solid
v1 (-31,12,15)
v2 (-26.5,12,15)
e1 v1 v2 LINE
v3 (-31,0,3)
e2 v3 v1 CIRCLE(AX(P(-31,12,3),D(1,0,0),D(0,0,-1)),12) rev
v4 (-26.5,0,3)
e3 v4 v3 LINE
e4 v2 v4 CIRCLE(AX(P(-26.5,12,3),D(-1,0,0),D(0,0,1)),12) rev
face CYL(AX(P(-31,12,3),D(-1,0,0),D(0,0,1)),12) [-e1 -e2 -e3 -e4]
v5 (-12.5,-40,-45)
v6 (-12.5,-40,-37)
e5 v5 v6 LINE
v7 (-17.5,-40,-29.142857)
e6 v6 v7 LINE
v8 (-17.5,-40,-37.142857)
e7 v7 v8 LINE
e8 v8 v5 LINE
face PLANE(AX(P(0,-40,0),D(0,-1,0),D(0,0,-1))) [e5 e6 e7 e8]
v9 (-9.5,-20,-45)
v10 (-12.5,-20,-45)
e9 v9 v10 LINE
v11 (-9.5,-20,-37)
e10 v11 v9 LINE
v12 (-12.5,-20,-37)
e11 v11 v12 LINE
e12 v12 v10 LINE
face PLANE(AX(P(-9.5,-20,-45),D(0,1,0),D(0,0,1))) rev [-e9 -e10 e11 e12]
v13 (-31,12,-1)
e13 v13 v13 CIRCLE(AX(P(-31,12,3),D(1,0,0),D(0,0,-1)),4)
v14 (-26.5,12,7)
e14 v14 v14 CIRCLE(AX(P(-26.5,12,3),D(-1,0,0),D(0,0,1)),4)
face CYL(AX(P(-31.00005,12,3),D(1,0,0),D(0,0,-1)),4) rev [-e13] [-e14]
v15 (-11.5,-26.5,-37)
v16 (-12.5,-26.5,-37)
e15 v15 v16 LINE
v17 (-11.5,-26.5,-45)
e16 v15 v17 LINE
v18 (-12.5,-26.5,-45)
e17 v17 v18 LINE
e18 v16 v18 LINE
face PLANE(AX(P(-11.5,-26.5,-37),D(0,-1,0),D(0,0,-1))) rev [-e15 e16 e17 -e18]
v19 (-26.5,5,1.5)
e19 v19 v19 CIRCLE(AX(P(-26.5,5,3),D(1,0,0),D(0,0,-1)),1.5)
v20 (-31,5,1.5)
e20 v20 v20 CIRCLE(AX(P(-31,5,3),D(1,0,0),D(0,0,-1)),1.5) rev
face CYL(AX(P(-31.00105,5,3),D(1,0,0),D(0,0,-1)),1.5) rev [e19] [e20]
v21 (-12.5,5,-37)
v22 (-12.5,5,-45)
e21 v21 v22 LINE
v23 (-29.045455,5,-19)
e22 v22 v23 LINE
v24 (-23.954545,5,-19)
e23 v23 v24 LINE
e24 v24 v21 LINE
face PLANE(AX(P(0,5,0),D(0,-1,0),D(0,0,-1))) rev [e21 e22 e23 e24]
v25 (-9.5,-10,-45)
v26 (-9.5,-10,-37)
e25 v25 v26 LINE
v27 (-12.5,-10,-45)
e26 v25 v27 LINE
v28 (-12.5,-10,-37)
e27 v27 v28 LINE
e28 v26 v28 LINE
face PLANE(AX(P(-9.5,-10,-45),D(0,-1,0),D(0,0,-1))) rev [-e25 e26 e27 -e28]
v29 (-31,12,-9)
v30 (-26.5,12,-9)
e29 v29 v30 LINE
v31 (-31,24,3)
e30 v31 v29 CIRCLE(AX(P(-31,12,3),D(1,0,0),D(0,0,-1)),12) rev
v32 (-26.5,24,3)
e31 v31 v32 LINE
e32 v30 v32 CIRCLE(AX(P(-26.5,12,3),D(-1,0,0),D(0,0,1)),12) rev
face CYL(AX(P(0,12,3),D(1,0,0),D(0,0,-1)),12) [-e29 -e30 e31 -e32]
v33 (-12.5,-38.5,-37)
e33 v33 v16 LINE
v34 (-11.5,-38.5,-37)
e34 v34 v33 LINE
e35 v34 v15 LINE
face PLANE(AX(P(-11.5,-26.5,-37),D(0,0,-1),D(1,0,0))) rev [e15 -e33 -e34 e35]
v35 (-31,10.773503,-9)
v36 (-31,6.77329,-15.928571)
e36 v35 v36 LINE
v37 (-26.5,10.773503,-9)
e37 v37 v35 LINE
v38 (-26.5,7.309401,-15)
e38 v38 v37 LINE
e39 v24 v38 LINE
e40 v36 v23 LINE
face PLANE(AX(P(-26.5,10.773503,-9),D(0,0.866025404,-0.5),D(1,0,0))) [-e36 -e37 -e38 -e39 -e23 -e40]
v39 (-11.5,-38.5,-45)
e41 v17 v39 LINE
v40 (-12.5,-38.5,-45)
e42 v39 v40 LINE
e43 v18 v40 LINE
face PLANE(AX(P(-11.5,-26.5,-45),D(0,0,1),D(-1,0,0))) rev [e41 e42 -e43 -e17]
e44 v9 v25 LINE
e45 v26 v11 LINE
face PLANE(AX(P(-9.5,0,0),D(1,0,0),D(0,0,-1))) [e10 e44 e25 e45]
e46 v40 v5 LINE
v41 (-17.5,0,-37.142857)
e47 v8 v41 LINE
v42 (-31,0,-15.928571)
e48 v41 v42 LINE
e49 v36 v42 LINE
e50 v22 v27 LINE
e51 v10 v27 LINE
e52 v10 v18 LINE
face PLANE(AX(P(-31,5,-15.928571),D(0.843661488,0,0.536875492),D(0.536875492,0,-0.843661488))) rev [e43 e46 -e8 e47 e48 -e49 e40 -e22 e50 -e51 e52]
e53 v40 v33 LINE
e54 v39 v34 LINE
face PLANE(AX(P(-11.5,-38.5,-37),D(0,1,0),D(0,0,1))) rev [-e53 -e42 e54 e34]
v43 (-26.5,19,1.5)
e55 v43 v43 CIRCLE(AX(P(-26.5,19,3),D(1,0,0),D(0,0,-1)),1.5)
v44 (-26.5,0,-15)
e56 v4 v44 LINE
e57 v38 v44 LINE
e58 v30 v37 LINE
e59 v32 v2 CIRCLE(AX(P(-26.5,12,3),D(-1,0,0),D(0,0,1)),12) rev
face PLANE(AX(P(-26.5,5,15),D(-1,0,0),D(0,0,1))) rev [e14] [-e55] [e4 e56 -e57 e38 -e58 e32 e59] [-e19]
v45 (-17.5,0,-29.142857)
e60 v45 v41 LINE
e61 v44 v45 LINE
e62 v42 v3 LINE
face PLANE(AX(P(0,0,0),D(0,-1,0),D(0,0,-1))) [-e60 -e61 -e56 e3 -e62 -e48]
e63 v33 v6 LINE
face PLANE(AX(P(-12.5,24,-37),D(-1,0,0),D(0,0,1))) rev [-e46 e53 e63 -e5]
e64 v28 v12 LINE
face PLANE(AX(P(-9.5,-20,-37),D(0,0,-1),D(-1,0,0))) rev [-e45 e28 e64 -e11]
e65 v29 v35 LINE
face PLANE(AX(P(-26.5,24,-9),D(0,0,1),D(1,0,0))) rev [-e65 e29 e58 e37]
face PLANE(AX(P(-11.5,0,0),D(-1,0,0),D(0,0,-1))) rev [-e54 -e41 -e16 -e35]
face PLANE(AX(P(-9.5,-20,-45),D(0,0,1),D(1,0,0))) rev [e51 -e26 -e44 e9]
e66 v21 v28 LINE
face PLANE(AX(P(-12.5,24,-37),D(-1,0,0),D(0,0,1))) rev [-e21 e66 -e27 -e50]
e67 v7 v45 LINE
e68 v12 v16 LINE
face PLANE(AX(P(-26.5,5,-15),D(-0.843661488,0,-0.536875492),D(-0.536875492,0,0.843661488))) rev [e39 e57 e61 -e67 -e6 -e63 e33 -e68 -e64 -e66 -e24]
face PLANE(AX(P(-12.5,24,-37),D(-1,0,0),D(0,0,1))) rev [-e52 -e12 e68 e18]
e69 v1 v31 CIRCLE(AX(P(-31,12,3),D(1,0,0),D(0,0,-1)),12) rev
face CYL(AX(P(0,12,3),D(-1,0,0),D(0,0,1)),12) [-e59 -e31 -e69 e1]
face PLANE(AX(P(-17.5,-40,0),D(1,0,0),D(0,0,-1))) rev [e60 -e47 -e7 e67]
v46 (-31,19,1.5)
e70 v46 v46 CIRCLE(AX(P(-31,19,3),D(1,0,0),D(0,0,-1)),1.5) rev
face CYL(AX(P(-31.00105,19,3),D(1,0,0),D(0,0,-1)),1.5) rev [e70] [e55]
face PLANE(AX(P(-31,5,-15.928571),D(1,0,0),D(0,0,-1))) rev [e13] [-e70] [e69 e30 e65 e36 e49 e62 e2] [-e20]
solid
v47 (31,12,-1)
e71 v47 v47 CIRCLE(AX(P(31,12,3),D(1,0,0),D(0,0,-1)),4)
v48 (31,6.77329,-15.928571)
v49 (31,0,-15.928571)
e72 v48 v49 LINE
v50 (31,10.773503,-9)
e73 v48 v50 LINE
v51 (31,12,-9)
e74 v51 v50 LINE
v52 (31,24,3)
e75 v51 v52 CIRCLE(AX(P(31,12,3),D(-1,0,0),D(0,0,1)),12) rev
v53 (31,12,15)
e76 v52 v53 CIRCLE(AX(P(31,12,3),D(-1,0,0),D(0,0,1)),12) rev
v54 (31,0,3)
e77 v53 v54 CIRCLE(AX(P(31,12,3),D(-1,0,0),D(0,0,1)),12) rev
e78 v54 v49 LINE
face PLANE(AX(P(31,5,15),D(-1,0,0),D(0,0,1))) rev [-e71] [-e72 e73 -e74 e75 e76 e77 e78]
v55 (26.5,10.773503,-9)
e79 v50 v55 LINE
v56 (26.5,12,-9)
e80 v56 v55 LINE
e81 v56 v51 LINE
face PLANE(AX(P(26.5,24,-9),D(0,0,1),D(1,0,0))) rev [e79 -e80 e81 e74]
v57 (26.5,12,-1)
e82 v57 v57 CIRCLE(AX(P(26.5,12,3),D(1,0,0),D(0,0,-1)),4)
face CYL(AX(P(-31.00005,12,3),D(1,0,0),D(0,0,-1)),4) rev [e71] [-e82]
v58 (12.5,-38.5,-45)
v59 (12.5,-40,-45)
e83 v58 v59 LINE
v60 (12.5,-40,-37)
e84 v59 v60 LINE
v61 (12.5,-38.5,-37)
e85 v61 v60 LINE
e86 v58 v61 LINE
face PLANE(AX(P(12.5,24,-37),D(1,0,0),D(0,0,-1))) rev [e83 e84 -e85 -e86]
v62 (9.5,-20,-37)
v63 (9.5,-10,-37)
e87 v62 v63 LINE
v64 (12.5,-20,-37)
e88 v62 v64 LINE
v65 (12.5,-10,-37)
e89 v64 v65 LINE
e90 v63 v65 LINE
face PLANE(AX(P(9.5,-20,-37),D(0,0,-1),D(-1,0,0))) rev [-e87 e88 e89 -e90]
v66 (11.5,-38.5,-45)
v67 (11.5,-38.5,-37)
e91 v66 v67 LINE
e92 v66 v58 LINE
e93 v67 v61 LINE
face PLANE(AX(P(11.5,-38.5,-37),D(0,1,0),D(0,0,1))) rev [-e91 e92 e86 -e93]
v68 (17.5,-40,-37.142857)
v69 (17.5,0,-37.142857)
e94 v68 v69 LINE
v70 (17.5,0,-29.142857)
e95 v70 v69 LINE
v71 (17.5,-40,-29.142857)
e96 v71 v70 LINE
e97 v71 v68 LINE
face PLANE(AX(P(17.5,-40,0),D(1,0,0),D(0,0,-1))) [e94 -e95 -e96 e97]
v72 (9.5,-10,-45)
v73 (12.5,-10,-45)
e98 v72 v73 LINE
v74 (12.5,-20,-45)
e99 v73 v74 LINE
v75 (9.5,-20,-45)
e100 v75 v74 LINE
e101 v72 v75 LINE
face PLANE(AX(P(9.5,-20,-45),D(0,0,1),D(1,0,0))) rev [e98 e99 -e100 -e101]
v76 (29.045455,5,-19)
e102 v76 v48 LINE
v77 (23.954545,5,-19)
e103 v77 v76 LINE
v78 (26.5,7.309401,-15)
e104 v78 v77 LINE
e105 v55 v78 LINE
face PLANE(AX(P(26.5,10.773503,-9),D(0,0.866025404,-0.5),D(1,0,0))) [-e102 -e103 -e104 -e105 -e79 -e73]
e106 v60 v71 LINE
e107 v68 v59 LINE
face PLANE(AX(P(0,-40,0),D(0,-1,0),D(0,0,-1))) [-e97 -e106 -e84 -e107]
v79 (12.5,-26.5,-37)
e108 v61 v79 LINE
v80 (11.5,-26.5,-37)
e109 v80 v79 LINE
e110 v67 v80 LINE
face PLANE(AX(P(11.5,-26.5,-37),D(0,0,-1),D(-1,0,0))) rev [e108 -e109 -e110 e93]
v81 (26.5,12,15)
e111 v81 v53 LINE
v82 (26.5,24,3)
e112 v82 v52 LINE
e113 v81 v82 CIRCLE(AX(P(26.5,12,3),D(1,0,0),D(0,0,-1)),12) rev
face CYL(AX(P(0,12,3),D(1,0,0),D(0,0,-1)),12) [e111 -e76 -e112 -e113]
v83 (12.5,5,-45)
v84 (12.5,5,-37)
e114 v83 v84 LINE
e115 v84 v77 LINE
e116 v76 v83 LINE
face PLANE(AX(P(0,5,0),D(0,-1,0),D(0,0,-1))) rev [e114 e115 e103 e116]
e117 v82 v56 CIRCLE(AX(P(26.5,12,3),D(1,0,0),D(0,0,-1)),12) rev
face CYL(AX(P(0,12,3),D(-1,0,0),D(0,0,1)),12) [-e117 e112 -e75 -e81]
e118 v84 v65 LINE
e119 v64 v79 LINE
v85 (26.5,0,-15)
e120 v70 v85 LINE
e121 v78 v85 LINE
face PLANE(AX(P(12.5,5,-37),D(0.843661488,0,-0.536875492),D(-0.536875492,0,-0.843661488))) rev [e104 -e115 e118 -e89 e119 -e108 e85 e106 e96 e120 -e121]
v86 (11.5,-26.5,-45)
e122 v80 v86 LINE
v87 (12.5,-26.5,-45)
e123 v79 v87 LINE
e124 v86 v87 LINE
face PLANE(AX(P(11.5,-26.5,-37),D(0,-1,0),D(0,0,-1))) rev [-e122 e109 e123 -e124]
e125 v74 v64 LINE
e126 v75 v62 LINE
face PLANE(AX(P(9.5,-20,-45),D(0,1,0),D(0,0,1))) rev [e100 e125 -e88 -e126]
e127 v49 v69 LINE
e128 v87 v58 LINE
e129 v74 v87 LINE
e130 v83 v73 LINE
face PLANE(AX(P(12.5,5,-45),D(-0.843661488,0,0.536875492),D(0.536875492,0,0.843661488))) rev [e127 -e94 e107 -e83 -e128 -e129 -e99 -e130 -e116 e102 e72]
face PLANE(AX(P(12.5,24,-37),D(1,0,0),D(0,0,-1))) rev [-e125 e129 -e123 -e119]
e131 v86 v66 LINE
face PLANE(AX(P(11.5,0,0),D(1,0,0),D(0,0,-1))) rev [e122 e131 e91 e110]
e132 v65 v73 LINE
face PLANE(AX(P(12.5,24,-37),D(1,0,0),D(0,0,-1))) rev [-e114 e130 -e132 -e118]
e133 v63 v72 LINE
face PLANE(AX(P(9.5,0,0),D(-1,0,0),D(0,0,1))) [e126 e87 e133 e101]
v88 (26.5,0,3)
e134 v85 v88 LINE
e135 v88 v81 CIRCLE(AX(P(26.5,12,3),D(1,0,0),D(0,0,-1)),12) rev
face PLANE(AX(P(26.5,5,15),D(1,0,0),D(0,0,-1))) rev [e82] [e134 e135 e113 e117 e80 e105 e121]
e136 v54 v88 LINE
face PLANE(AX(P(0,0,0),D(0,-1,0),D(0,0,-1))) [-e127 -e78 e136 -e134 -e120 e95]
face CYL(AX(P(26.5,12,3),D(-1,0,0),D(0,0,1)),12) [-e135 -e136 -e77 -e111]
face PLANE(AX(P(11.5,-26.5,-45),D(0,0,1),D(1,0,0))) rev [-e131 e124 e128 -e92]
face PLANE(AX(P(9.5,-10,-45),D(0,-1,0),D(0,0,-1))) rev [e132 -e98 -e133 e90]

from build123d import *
from OCP.BRepFilletAPI import BRepFilletAPI_MakeChamfer

# Parameters (mm, degrees)
BOSS_EXTRUDE1_DEPTH     = 5
SKETCH2_W               = 4.5
SKETCH2_H               = 24
BOSS_EXTRUDE2_DEPTH     = 19
CUT_EXTRUDE1_REACH      = 59.853
SKETCH5_R               = 1.7
CUT_EXTRUDE2_REACH      = 73.673
SKETCH6_W               = 14
SKETCH6_H               = 3
CUT_EXTRUDE3_REACH      = 78.859
SKETCH7_R               = 1.5
CUT_EXTRUDE4_DEPTH      = 77.85863647
CUT_EXTRUDE4_DEPTH_BACK = 77.85863647
SKETCH8_R               = 4
FILLET1_R               = 12
CHAMFER2_SIZE           = 10
CHAMFER2_SIZE2          = 5.773502692
CUT_EXTRUDE5_REACH      = 59.853
SKETCH10_R              = 1.7
SKETCH_1_W              = 25
SKETCH_1_H              = 8
CUT_EXTRUDE_1_DEPTH     = 60.682493246
EXTRUDE_2_DEPTH         = 40
SKETCH_5_W              = 8
SKETCH_5_H              = 10
EXTRUDE_3_DEPTH         = 3
SKETCH_4_W              = 8
SKETCH_4_H              = 10
EXTRUDE_4_DEPTH         = 3
SKETCH_7_W              = 8
SKETCH_7_H              = 12
EXTRUDE_5_DEPTH         = 1


with BuildPart() as part:
    # Sketch1 → Boss-Extrude1 (new body)
    with BuildSketch(Plane(origin=(0, 0, 0), x_dir=(1, 0, 0), z_dir=(0, 1, 0))):
        Polygon((-31, 15.928571429), (-31, -15), (-26.5, -15), (-26.5, 15), (-12.5, 37), (12.5, 37), (26.5, 15), (26.5, -15), (31, -15), (31, 15.928571429), (12.5, 45), (-12.5, 45), align=None)
    extrude(amount=BOSS_EXTRUDE1_DEPTH)

    # Sketch2 → Boss-Extrude2 (add)
    with BuildSketch(Plane(origin=(0, 5, 0), x_dir=(1, 0, 0), z_dir=(0, 1, 0))):
        with Locations((-28.75, -3)):
            Rectangle(SKETCH2_W, SKETCH2_H)
        with Locations((28.75, -3)):
            Rectangle(SKETCH2_W, SKETCH2_H)
    extrude(amount=BOSS_EXTRUDE2_DEPTH)

    # Sketch5 → Cut-Extrude1 (cut, up to next)
    with BuildSketch(Plane(origin=(0, 5, 0), x_dir=(1, 0, 0), z_dir=(0, 1, 0)), mode=Mode.PRIVATE) as cut_extrude1_sk1:
        with Locations(Location((0, 41, 0), (0, 0, 270))):
            Circle(SKETCH5_R)
    cut_extrude1_tool1 = extrude(cut_extrude1_sk1.sketch, amount=-CUT_EXTRUDE1_REACH, mode=Mode.PRIVATE) & part.part
    add(cut_extrude1_tool1.solids().sort_by_distance((0, 5, -41))[0], mode=Mode.SUBTRACT)

    # Cut-Extrude2: up to this face of the body (flat: up to its plane)
    cut_extrude2_end = Plane(part.part.faces().sort_by_distance((0, 2.5, -37))[0])
    # Sketch6 → Cut-Extrude2 (cut, up to the picked face)
    with BuildSketch(Plane(origin=(0, 0, -45), x_dir=(-1, 0, 0), z_dir=(0, 0, -1)), mode=Mode.PRIVATE) as cut_extrude2_sk1:
        with Locations((0, 3.5)):
            Rectangle(SKETCH6_W, SKETCH6_H)
    cut_extrude2_tool1 = split(extrude(cut_extrude2_sk1.sketch, amount=-CUT_EXTRUDE2_REACH, mode=Mode.PRIVATE), bisect_by=cut_extrude2_end, keep=Keep.BOTH, mode=Mode.PRIVATE)
    add(cut_extrude2_tool1.solids().sort_by(Axis((0, 3.5, -45), (0, 0, 1)))[0], mode=Mode.SUBTRACT)

    # Sketch7 → Cut-Extrude3 (cut, up to next)
    with BuildSketch(Plane(origin=(-26.5, 0, 0), x_dir=(0, 0, -1), z_dir=(1, 0, 0)), mode=Mode.PRIVATE) as cut_extrude3_sk1:
        with Locations((-3, 19)):
            Circle(SKETCH7_R)
    cut_extrude3_tool1 = extrude(cut_extrude3_sk1.sketch, amount=-CUT_EXTRUDE3_REACH, mode=Mode.PRIVATE) & part.part
    # Sketch7 → Cut-Extrude3 (cut, up to next)
    with BuildSketch(Plane(origin=(-26.5, 0, 0), x_dir=(0, 0, -1), z_dir=(1, 0, 0)), mode=Mode.PRIVATE) as cut_extrude3_sk2:
        with Locations((-3, 5)):
            Circle(SKETCH7_R)
    cut_extrude3_tool2 = extrude(cut_extrude3_sk2.sketch, amount=-CUT_EXTRUDE3_REACH, mode=Mode.PRIVATE) & part.part
    add(cut_extrude3_tool1.solids().sort_by_distance((-26.5, 19, 3))[0], mode=Mode.SUBTRACT)
    add(cut_extrude3_tool2.solids().sort_by_distance((-26.5, 5, 3))[0], mode=Mode.SUBTRACT)

    # Sketch8 → Cut-Extrude4 (cut, two sides: drawn at the far end of the back side and taken through both)
    with BuildSketch(Plane(origin=(-26.5, 0, 0), x_dir=(0, 0, -1), z_dir=(1, 0, 0)).offset(-CUT_EXTRUDE4_DEPTH_BACK)):
        with Locations((-3, 12)):
            Circle(SKETCH8_R)
    extrude(amount=CUT_EXTRUDE4_DEPTH + CUT_EXTRUDE4_DEPTH_BACK, mode=Mode.SUBTRACT)

    # Fillet1
    fillet1_edges = [part.edges().sort_by_distance(p)[0] for p in [
        (28.75, 0, 15),
        (-28.75, 0, 15),
        (-28.75, 24, -9),
        (28.75, 24, -9),
        (28.75, 24, 15),
        (-28.75, 24, 15),
    ]]
    fillet(fillet1_edges, radius=FILLET1_R - 0.0001)  # a hair under: the kernel refuses the full size

    # Chamfer2: one chamfer whose edges measure the first distance from different faces: ONE call of the kernel's chamfer builder (chamfer() names one face for all edges)
    chamfer2_edges_1 = [part.edges().sort_by_distance(p)[0] for p in [
        (-28.75, 5, -9),
    ]]
    chamfer2_side_1 = [part.faces().sort_by_distance(p)[0] for p in [
        (-19.473621736, 5, -28.773341624),
    ]]
    chamfer2_edges_2 = [part.edges().sort_by_distance(p)[0] for p in [
        (28.75, 5, -9),
    ]]
    chamfer2_side_2 = [part.faces().sort_by_distance(p)[0] for p in [
        (19.473621736, 5, -28.773341624),
    ]]
    chamfer2 = BRepFilletAPI_MakeChamfer(part.part.solid().wrapped)
    for e in chamfer2_edges_1:
        chamfer2.Add(CHAMFER2_SIZE, CHAMFER2_SIZE2, e.wrapped, chamfer2_side_1[0].wrapped)  # the first distance lies on this face
    for e in chamfer2_edges_2:
        chamfer2.Add(CHAMFER2_SIZE, CHAMFER2_SIZE2, e.wrapped, chamfer2_side_2[0].wrapped)  # the first distance lies on this face
    add(Compound.cast(chamfer2.Shape()), mode=Mode.REPLACE)

    # Sketch10 → Cut-Extrude5 (cut, up to next)
    with BuildSketch(Plane(origin=(0, 5, 0), x_dir=(1, 0, 0), z_dir=(0, 1, 0)), mode=Mode.PRIVATE) as cut_extrude5_sk1:
        with Locations(Location((-10, 41, 0), (0, 0, 270))):
            Circle(SKETCH10_R)
    cut_extrude5_tool1 = extrude(cut_extrude5_sk1.sketch, amount=-CUT_EXTRUDE5_REACH, mode=Mode.PRIVATE) & part.part
    cut_extrude5 = cut_extrude5_tool1.solids().sort_by_distance((-10, 5, -41))[0]
    add(cut_extrude5, mode=Mode.SUBTRACT)

    # Mirror1: Cut-Extrude5 across plane
    add(cut_extrude5.mirror(Plane(origin=(0, 0, 0), x_dir=(0, 0, 1), z_dir=(1, 0, 0))), mode=Mode.SUBTRACT)

    # 草图1 → 切除-拉伸1 (cut, through all)
    with BuildSketch(Plane.XZ):
        with Locations((0, -41)):
            Rectangle(SKETCH_1_W, SKETCH_1_H)
    extrude(amount=-CUT_EXTRUDE_1_DEPTH, mode=Mode.SUBTRACT)


with BuildPart() as cut_extrude_1_piece_1:
    # of the separate pieces the step leaves, piece 1, a body of its own (cut_extrude_1_pieces)
    add(part.part.solids().sort_by_distance((31, 6.773290113, -15.928571429))[0])



with BuildPart() as cut_extrude_1_piece_2:
    # of the separate pieces the step leaves, piece 2, a body of its own (cut_extrude_1_pieces)
    add(part.part.solids().sort_by_distance((-31, 6.773290113, -15.928571429))[0])


with BuildPart() as cut_extrude_1_piece_1_1:
    add(cut_extrude_1_piece_1.part)

    add(cut_extrude_1_piece_2.part)  # 凸台-拉伸2 merges 切除-拉伸1 piece 2
    # 草图2 → 凸台-拉伸2 (add)
    with BuildSketch(Plane(origin=(0, 0, 0), x_dir=(-1, 0, 0), z_dir=(0, -1, 0))):
        Polygon((-12.5, 37), (-17.5, 29.142857143), (-17.5, 37.142857143), (-12.5, 45), align=None)
        Polygon((12.5, 37), (17.5, 29.142857143), (17.5, 37.142857143), (12.5, 45), align=None)
    extrude(amount=EXTRUDE_2_DEPTH)

    # 草图5 → 凸台-拉伸3 (add)
    with BuildSketch(Plane(origin=(-12.5, 0, 0), x_dir=(0, 0, -1), z_dir=(1, 0, 0))):
        with Locations((41, -15)):
            Rectangle(SKETCH_5_W, SKETCH_5_H)
    extrude(amount=EXTRUDE_3_DEPTH)

    # 草图4 → 凸台-拉伸4 (add)
    with BuildSketch(Plane.ZY.offset(-12.5)):
        with Locations((-41, -15)):
            Rectangle(SKETCH_4_W, SKETCH_4_H)
    extrude(amount=EXTRUDE_4_DEPTH)

    # 草图7 → 凸台-拉伸5 (add)
    with BuildSketch(Plane.ZY.offset(-12.5)):
        with Locations((-41, -32.5)):
            Rectangle(SKETCH_7_W, SKETCH_7_H)
    extrude_5 = extrude(amount=EXTRUDE_5_DEPTH)

    # 镜向1: 凸台-拉伸5 across plane
    add(extrude_5.mirror(Plane(origin=(0, 0, 0), x_dir=(0, 0, 1), z_dir=(1, 0, 0))))


solid = cut_extrude_1_piece_1_1.part
